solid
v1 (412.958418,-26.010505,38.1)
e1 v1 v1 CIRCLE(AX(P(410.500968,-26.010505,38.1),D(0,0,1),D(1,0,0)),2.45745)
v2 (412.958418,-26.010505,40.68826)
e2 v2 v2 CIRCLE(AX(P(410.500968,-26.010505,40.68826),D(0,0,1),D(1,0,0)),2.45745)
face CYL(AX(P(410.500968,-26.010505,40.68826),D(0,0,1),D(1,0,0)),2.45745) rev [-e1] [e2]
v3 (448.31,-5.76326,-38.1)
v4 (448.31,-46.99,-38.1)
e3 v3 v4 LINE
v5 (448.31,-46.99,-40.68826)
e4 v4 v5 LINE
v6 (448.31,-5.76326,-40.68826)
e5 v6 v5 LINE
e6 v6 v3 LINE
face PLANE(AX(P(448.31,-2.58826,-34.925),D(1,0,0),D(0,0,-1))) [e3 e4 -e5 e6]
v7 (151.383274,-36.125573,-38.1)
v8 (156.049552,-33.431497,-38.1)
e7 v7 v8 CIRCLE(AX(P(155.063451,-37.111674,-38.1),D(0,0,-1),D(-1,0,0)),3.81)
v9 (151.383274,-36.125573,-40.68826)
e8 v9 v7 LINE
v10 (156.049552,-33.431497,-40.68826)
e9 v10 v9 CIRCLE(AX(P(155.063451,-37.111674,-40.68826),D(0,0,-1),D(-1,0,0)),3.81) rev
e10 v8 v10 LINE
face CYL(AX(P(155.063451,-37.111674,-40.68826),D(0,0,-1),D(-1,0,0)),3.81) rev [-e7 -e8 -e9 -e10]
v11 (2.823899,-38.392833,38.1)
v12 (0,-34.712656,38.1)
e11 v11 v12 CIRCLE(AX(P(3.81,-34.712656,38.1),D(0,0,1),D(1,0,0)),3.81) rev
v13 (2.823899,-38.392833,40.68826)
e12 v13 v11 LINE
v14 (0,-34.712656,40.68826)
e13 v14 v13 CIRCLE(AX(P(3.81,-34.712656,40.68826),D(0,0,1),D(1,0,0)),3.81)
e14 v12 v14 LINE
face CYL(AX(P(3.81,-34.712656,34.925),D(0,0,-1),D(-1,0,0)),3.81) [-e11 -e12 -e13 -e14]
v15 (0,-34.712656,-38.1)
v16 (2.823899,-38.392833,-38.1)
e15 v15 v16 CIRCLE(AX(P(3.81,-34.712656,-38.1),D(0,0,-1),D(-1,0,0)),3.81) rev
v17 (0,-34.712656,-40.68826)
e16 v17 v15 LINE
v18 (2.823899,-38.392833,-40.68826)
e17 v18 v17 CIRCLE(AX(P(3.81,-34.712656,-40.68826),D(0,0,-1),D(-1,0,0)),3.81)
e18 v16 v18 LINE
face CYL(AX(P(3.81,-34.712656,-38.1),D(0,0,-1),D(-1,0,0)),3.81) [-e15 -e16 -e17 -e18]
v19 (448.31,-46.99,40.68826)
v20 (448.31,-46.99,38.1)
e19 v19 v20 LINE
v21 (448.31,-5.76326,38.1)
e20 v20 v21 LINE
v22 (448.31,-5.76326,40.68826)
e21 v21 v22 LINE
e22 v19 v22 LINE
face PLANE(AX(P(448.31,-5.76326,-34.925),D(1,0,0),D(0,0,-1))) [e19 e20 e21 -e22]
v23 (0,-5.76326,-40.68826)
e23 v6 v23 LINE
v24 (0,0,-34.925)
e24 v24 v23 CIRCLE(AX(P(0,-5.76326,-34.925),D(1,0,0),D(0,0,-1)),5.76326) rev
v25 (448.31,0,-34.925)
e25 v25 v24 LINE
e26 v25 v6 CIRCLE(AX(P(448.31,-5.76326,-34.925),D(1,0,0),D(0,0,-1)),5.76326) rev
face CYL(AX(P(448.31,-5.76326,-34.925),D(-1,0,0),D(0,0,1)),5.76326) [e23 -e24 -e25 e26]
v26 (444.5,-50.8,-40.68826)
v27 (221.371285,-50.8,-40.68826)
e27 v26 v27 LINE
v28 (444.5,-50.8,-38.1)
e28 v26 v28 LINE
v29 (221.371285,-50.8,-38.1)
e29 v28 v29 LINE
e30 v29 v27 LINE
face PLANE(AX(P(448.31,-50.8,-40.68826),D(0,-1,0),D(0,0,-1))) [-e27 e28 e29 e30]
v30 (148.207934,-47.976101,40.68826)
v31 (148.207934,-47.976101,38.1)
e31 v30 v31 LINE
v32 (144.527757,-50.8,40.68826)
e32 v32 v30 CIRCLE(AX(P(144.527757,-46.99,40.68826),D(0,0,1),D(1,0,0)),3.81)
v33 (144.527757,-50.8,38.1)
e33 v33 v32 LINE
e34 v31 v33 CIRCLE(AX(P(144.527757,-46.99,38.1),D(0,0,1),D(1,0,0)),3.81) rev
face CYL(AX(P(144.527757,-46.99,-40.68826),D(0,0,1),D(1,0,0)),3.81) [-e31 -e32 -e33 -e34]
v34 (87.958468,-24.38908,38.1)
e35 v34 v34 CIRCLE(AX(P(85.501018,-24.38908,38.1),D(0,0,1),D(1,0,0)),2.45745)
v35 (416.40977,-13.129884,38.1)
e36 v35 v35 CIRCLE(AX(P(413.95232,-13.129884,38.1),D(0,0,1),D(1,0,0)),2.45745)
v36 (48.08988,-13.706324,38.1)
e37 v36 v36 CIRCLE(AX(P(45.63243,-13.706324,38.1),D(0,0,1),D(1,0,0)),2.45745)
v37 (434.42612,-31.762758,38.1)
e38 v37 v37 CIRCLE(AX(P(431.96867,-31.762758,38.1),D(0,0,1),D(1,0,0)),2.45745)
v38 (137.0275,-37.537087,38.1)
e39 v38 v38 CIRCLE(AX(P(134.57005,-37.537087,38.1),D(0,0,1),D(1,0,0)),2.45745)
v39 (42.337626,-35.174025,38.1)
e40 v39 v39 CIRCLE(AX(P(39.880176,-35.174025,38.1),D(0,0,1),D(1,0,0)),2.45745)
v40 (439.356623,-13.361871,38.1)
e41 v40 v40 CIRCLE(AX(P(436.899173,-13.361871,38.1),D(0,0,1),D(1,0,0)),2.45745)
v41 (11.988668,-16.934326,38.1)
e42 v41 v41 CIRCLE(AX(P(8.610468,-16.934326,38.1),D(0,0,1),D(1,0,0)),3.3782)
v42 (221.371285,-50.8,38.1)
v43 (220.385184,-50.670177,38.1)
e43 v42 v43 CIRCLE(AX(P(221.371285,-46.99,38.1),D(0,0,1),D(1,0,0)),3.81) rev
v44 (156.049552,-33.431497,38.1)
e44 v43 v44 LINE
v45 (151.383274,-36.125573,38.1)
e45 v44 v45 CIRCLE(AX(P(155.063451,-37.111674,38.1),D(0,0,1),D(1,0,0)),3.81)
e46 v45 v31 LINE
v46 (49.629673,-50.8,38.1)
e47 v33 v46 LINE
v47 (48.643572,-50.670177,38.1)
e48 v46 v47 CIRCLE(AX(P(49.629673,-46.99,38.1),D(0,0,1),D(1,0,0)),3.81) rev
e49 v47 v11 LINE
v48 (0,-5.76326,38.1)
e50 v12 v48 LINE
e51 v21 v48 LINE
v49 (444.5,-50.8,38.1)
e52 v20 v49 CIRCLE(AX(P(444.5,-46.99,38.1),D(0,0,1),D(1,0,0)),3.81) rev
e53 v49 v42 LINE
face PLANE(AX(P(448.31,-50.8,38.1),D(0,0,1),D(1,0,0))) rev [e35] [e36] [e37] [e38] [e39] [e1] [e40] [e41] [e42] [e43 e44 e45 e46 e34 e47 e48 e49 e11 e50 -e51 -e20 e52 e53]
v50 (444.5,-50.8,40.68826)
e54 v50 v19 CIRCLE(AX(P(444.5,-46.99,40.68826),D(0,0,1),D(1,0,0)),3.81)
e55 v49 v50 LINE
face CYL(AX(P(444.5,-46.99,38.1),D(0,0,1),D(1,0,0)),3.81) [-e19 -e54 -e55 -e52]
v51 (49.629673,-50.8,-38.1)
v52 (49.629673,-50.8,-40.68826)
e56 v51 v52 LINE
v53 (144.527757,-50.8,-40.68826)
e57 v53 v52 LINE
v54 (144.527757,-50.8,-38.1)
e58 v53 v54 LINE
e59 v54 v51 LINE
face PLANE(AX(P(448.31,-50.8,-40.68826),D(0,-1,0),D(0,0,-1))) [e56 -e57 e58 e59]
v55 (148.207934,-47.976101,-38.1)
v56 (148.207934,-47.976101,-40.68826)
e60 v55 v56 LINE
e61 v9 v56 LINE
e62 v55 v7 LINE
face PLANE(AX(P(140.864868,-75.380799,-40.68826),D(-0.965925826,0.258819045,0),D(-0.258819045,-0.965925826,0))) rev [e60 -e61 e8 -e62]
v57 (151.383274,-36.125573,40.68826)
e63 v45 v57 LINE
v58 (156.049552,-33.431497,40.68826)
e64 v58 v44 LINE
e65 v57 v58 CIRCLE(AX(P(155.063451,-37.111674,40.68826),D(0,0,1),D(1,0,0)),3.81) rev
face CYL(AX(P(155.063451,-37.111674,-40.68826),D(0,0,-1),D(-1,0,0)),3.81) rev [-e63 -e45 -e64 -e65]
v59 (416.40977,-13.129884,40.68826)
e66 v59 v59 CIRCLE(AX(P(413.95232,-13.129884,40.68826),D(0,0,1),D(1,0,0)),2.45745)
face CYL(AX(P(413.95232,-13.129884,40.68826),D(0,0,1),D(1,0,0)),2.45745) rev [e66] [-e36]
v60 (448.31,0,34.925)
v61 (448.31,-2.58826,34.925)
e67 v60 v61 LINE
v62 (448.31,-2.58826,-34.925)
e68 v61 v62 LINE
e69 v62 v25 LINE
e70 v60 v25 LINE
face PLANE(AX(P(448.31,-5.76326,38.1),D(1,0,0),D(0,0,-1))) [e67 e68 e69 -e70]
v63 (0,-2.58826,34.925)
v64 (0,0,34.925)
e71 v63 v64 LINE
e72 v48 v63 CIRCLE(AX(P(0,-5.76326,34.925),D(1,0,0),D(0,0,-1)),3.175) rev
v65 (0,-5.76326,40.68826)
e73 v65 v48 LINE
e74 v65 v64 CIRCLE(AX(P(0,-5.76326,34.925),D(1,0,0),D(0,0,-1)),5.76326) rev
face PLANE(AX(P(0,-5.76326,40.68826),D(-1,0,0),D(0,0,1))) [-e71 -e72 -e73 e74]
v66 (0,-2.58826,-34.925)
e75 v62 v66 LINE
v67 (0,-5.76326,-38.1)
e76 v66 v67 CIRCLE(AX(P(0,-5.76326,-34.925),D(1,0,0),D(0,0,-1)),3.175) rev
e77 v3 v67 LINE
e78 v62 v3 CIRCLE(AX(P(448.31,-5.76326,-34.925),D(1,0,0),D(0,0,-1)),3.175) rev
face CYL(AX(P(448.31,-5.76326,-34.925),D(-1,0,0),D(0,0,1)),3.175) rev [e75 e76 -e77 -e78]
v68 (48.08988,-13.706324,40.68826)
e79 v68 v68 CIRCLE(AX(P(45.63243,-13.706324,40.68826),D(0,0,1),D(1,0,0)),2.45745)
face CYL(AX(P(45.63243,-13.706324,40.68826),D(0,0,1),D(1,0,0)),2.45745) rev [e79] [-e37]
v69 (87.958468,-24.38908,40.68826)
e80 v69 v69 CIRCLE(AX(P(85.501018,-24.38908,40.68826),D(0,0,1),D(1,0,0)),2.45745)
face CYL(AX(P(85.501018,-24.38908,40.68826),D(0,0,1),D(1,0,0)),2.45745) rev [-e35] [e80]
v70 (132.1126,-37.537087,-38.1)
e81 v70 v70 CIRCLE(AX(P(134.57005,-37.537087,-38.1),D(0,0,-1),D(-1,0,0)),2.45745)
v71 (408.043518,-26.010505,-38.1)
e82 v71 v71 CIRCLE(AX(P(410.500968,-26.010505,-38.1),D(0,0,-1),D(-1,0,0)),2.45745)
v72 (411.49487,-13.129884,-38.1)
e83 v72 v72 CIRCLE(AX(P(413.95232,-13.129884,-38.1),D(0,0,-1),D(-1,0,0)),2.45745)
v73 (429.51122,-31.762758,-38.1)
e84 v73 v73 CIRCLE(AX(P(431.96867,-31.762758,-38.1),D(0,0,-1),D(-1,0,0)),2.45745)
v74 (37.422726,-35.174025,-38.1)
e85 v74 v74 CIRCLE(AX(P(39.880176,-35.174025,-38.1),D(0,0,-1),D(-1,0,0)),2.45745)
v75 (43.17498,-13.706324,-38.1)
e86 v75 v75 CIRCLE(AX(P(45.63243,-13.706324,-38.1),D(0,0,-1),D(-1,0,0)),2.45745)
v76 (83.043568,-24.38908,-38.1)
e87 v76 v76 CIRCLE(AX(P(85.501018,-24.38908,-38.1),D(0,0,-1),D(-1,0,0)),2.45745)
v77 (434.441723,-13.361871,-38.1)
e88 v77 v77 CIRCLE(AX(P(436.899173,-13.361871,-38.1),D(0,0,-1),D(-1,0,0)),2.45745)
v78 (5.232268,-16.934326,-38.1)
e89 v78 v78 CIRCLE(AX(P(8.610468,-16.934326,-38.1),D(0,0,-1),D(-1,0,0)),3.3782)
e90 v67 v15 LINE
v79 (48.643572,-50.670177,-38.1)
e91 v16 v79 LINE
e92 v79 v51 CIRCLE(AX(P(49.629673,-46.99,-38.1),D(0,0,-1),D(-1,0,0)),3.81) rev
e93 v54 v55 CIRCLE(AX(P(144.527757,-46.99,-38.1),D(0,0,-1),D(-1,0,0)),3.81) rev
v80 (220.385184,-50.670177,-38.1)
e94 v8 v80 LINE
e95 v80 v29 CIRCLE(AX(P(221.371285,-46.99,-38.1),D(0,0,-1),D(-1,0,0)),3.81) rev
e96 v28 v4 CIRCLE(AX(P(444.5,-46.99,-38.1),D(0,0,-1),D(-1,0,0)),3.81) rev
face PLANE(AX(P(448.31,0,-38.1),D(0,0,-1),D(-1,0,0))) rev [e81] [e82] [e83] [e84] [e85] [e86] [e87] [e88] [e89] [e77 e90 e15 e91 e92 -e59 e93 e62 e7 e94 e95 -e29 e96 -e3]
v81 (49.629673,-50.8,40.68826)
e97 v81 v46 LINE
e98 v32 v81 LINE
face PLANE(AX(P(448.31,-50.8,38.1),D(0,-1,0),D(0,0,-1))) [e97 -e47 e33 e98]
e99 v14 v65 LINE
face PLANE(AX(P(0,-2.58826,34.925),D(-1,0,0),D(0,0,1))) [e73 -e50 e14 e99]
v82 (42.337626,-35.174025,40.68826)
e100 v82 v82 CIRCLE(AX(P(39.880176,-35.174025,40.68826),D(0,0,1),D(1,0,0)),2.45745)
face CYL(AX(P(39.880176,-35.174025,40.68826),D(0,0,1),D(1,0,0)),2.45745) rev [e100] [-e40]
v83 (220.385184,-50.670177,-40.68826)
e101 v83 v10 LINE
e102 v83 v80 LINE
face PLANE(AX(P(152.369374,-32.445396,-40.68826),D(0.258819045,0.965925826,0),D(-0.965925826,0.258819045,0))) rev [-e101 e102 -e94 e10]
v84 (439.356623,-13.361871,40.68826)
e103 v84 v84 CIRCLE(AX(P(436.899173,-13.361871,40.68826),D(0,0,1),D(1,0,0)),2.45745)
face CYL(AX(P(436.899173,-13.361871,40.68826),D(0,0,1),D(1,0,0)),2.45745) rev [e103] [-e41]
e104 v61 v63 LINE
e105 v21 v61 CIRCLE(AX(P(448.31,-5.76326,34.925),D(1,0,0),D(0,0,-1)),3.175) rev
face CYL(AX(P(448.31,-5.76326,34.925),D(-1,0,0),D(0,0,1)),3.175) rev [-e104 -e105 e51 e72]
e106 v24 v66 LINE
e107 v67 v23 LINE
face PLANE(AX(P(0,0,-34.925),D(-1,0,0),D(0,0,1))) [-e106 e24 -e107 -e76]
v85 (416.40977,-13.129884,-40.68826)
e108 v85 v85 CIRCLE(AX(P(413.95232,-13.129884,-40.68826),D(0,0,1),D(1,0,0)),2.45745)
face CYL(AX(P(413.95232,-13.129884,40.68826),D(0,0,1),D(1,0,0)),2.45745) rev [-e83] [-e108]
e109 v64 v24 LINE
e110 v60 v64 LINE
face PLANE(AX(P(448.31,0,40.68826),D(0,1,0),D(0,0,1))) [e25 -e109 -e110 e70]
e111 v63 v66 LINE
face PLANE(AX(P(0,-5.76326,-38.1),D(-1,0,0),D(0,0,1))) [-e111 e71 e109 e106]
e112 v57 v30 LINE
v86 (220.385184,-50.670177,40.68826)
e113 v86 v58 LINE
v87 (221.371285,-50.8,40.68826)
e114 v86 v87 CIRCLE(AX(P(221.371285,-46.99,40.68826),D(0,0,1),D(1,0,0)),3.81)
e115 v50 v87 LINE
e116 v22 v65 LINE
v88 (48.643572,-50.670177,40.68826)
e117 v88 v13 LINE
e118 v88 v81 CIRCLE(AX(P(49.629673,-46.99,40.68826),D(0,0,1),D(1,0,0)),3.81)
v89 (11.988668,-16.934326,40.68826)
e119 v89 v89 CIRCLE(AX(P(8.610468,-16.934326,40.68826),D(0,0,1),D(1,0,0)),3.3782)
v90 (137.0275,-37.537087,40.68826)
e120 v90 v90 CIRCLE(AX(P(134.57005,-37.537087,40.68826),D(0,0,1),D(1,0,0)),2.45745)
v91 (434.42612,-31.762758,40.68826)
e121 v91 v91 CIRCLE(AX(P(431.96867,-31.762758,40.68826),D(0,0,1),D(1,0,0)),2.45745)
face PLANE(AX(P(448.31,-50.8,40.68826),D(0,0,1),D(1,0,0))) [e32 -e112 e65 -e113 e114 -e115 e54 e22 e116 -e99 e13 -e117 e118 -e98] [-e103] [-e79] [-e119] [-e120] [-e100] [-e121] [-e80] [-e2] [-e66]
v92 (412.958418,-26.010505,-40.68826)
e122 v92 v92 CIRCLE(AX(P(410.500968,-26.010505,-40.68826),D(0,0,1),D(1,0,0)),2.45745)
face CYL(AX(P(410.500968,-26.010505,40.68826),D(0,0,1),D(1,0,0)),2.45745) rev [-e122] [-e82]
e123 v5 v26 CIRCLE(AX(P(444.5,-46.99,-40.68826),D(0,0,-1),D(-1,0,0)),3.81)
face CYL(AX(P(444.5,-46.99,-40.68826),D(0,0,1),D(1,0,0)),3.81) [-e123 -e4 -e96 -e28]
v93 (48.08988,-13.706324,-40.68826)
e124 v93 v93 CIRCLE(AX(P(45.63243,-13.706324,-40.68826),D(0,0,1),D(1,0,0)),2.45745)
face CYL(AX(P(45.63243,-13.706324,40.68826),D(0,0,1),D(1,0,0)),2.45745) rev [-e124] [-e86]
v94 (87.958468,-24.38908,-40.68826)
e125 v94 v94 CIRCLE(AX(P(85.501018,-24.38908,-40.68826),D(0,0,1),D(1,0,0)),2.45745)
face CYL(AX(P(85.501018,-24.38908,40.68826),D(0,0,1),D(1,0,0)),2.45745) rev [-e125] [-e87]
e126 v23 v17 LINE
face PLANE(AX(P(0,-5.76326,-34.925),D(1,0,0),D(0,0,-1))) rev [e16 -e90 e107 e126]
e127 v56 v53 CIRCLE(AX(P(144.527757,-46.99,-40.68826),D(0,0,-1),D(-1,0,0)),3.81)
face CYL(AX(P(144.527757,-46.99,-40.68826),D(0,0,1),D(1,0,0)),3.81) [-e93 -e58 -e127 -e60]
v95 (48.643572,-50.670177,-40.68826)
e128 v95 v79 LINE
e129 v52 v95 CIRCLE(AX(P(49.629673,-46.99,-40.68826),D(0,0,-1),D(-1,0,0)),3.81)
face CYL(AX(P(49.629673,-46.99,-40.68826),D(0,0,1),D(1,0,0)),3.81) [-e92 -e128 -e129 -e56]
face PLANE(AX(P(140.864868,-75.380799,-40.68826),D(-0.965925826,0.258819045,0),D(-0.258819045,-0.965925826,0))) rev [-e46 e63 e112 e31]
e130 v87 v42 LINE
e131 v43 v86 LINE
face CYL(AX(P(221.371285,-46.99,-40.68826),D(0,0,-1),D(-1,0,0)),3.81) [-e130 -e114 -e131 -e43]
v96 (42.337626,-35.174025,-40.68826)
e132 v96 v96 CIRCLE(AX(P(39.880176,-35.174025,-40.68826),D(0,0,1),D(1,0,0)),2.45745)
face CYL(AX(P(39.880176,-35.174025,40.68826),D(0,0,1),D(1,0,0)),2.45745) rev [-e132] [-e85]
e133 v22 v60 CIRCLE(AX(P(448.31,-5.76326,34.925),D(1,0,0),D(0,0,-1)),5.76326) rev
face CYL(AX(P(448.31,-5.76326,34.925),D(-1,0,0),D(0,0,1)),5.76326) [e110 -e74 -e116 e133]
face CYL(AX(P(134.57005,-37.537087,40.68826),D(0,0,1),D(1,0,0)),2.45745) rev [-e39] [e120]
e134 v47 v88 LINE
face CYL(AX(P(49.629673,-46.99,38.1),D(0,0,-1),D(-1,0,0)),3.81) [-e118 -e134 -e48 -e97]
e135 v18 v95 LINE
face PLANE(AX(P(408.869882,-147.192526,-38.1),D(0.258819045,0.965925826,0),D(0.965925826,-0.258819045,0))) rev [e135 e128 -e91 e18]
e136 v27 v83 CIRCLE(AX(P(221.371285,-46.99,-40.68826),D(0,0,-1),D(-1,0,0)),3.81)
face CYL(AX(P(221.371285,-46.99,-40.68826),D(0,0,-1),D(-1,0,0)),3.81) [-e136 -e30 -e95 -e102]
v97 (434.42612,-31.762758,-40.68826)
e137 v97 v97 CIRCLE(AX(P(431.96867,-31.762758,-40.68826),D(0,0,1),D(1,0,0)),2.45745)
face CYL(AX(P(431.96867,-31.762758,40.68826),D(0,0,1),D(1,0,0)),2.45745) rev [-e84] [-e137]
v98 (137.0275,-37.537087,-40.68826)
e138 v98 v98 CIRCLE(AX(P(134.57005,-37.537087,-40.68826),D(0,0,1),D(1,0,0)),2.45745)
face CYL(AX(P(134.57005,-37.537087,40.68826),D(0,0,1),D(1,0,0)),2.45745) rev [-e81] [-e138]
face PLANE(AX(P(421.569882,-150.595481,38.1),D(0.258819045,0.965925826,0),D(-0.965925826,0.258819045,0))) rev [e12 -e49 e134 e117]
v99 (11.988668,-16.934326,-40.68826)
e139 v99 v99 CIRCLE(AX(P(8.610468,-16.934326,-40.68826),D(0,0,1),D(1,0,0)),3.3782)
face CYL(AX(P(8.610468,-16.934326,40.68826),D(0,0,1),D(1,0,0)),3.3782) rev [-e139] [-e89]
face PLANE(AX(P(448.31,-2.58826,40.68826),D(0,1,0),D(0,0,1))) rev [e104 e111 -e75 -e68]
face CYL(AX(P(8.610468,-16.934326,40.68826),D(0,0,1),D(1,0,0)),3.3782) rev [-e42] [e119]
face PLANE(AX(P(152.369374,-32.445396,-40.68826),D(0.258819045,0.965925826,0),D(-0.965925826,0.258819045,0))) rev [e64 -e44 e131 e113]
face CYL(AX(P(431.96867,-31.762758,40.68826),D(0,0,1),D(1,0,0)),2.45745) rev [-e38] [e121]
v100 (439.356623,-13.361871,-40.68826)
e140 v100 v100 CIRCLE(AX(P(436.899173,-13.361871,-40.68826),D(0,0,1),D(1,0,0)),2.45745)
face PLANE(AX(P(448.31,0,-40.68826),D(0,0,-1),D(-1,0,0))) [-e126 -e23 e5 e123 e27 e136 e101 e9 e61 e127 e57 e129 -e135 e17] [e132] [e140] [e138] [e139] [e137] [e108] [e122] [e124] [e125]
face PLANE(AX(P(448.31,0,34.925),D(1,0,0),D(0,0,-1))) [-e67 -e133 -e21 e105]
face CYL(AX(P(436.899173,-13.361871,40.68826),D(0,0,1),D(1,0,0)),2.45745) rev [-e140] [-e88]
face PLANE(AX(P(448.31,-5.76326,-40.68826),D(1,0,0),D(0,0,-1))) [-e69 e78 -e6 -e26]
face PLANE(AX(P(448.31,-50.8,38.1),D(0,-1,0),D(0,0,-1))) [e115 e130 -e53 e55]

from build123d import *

# Parameters (mm, degrees)
BASE_FLANGE1_DEPTH           = 448.31
CUT_EXTRUDE1_DEPTH           = 459.458977562
F_1_4_CLEARANCE_HOLE1_D      = 6.7564
F_10_0_1935_DIAMETER_HOLE1_D = 4.9149
CUT_EXTRUDE2_DEPTH           = 459.458977562
FILLET1_R                    = 3.81


# Sheet-metal steps are written as plain solids
with BuildPart() as part:
    # Sketch2 → Base-Flange1 (new body)
    with BuildSketch(Plane(origin=(0, 0, 0), x_dir=(0, 0, -1), z_dir=(1, 0, 0))):
        with BuildLine():
            Line((-40.68826, -50.8), (-40.68826, -5.76326))
            ThreePointArc((-40.68826, -5.76326), (-39.000240228, -1.688019772), (-34.925, 0))
            Line((-34.925, 0), (34.925, 0))
            ThreePointArc((34.925, 0), (39.000240228, -1.688019772), (40.68826, -5.76326))
            Line((40.68826, -5.76326), (40.68826, -50.8))
            Line((40.68826, -50.8), (38.1, -50.8))
            Line((38.1, -50.8), (38.1, -5.76326))
            ThreePointArc((38.1, -5.76326), (37.17006403, -3.51819597), (34.925, -2.58826))
            Line((34.925, -2.58826), (-34.925, -2.58826))
            ThreePointArc((-34.925, -2.58826), (-37.17006403, -3.51819597), (-38.1, -5.76326))
            Line((-38.1, -5.76326), (-38.1, -50.8))
            Line((-38.1, -50.8), (-40.68826, -50.8))
        make_face()
    extrude(amount=BASE_FLANGE1_DEPTH)

    # Sketch8 → Cut-Extrude1 (cut, through all)
    with BuildSketch(Plane.XY.offset(40.68826)):
        Polygon((0, -37.636171444), (49.128076995, -50.8), (0, -50.8), align=None)
    extrude(amount=-CUT_EXTRUDE1_DEPTH, mode=Mode.SUBTRACT)

    # 1/4 Clearance Hole1 (through all)
    with Locations(Plane.XY.offset(40.68826)):
        with Locations((8.61046841, -16.934326391)):
            Hole(F_1_4_CLEARANCE_HOLE1_D / 2)

    # #10 (0.1935) Diameter Hole1 (through all)
    with Locations(Plane.XY.offset(40.68826)):
        with Locations((410.50096824, -26.010505082), (413.952320207, -13.129884188), (436.899172539, -13.361871369), (431.968669729, -31.762758359), (39.880176489, -35.174025037), (45.632429766, -13.706323547), (85.501018246, -24.389079634), (134.570050222, -37.537087125)):
            Hole(F_10_0_1935_DIAMETER_HOLE1_D / 2)

    # Sketch9 → Cut-Extrude2 (cut, through all)
    with BuildSketch(Plane.XY.offset(40.68826)):
        Polygon((140.864867564, -75.380798949), (152.369374119, -32.445395971), (220.869688909, -50.8), (209.365182354, -93.735402979), align=None)
    extrude(amount=-CUT_EXTRUDE2_DEPTH, mode=Mode.SUBTRACT)

    # Fillet1
    fillet1_edges = [part.edges().sort_by_distance(p)[0] for p in [
        (147.451272792, -50.8, -39.39413),
        (147.451272792, -50.8, 39.39413),
        (152.369374119, -32.445395971, -39.39413),
        (152.369374119, -32.445395971, 39.39413),
        (220.869688909, -50.8, -39.39413),
        (220.869688909, -50.8, 39.39413),
        (448.31, -50.8, 39.39413),
        (49.128076995, -50.8, -39.39413),
        (0, -37.636171444, -39.39413),
        (0, -37.636171444, 39.39413),
        (49.128076995, -50.8, 39.39413),
        (448.31, -50.8, -39.39413),
    ]]
    fillet(fillet1_edges, radius=FILLET1_R)


solid = part.part
